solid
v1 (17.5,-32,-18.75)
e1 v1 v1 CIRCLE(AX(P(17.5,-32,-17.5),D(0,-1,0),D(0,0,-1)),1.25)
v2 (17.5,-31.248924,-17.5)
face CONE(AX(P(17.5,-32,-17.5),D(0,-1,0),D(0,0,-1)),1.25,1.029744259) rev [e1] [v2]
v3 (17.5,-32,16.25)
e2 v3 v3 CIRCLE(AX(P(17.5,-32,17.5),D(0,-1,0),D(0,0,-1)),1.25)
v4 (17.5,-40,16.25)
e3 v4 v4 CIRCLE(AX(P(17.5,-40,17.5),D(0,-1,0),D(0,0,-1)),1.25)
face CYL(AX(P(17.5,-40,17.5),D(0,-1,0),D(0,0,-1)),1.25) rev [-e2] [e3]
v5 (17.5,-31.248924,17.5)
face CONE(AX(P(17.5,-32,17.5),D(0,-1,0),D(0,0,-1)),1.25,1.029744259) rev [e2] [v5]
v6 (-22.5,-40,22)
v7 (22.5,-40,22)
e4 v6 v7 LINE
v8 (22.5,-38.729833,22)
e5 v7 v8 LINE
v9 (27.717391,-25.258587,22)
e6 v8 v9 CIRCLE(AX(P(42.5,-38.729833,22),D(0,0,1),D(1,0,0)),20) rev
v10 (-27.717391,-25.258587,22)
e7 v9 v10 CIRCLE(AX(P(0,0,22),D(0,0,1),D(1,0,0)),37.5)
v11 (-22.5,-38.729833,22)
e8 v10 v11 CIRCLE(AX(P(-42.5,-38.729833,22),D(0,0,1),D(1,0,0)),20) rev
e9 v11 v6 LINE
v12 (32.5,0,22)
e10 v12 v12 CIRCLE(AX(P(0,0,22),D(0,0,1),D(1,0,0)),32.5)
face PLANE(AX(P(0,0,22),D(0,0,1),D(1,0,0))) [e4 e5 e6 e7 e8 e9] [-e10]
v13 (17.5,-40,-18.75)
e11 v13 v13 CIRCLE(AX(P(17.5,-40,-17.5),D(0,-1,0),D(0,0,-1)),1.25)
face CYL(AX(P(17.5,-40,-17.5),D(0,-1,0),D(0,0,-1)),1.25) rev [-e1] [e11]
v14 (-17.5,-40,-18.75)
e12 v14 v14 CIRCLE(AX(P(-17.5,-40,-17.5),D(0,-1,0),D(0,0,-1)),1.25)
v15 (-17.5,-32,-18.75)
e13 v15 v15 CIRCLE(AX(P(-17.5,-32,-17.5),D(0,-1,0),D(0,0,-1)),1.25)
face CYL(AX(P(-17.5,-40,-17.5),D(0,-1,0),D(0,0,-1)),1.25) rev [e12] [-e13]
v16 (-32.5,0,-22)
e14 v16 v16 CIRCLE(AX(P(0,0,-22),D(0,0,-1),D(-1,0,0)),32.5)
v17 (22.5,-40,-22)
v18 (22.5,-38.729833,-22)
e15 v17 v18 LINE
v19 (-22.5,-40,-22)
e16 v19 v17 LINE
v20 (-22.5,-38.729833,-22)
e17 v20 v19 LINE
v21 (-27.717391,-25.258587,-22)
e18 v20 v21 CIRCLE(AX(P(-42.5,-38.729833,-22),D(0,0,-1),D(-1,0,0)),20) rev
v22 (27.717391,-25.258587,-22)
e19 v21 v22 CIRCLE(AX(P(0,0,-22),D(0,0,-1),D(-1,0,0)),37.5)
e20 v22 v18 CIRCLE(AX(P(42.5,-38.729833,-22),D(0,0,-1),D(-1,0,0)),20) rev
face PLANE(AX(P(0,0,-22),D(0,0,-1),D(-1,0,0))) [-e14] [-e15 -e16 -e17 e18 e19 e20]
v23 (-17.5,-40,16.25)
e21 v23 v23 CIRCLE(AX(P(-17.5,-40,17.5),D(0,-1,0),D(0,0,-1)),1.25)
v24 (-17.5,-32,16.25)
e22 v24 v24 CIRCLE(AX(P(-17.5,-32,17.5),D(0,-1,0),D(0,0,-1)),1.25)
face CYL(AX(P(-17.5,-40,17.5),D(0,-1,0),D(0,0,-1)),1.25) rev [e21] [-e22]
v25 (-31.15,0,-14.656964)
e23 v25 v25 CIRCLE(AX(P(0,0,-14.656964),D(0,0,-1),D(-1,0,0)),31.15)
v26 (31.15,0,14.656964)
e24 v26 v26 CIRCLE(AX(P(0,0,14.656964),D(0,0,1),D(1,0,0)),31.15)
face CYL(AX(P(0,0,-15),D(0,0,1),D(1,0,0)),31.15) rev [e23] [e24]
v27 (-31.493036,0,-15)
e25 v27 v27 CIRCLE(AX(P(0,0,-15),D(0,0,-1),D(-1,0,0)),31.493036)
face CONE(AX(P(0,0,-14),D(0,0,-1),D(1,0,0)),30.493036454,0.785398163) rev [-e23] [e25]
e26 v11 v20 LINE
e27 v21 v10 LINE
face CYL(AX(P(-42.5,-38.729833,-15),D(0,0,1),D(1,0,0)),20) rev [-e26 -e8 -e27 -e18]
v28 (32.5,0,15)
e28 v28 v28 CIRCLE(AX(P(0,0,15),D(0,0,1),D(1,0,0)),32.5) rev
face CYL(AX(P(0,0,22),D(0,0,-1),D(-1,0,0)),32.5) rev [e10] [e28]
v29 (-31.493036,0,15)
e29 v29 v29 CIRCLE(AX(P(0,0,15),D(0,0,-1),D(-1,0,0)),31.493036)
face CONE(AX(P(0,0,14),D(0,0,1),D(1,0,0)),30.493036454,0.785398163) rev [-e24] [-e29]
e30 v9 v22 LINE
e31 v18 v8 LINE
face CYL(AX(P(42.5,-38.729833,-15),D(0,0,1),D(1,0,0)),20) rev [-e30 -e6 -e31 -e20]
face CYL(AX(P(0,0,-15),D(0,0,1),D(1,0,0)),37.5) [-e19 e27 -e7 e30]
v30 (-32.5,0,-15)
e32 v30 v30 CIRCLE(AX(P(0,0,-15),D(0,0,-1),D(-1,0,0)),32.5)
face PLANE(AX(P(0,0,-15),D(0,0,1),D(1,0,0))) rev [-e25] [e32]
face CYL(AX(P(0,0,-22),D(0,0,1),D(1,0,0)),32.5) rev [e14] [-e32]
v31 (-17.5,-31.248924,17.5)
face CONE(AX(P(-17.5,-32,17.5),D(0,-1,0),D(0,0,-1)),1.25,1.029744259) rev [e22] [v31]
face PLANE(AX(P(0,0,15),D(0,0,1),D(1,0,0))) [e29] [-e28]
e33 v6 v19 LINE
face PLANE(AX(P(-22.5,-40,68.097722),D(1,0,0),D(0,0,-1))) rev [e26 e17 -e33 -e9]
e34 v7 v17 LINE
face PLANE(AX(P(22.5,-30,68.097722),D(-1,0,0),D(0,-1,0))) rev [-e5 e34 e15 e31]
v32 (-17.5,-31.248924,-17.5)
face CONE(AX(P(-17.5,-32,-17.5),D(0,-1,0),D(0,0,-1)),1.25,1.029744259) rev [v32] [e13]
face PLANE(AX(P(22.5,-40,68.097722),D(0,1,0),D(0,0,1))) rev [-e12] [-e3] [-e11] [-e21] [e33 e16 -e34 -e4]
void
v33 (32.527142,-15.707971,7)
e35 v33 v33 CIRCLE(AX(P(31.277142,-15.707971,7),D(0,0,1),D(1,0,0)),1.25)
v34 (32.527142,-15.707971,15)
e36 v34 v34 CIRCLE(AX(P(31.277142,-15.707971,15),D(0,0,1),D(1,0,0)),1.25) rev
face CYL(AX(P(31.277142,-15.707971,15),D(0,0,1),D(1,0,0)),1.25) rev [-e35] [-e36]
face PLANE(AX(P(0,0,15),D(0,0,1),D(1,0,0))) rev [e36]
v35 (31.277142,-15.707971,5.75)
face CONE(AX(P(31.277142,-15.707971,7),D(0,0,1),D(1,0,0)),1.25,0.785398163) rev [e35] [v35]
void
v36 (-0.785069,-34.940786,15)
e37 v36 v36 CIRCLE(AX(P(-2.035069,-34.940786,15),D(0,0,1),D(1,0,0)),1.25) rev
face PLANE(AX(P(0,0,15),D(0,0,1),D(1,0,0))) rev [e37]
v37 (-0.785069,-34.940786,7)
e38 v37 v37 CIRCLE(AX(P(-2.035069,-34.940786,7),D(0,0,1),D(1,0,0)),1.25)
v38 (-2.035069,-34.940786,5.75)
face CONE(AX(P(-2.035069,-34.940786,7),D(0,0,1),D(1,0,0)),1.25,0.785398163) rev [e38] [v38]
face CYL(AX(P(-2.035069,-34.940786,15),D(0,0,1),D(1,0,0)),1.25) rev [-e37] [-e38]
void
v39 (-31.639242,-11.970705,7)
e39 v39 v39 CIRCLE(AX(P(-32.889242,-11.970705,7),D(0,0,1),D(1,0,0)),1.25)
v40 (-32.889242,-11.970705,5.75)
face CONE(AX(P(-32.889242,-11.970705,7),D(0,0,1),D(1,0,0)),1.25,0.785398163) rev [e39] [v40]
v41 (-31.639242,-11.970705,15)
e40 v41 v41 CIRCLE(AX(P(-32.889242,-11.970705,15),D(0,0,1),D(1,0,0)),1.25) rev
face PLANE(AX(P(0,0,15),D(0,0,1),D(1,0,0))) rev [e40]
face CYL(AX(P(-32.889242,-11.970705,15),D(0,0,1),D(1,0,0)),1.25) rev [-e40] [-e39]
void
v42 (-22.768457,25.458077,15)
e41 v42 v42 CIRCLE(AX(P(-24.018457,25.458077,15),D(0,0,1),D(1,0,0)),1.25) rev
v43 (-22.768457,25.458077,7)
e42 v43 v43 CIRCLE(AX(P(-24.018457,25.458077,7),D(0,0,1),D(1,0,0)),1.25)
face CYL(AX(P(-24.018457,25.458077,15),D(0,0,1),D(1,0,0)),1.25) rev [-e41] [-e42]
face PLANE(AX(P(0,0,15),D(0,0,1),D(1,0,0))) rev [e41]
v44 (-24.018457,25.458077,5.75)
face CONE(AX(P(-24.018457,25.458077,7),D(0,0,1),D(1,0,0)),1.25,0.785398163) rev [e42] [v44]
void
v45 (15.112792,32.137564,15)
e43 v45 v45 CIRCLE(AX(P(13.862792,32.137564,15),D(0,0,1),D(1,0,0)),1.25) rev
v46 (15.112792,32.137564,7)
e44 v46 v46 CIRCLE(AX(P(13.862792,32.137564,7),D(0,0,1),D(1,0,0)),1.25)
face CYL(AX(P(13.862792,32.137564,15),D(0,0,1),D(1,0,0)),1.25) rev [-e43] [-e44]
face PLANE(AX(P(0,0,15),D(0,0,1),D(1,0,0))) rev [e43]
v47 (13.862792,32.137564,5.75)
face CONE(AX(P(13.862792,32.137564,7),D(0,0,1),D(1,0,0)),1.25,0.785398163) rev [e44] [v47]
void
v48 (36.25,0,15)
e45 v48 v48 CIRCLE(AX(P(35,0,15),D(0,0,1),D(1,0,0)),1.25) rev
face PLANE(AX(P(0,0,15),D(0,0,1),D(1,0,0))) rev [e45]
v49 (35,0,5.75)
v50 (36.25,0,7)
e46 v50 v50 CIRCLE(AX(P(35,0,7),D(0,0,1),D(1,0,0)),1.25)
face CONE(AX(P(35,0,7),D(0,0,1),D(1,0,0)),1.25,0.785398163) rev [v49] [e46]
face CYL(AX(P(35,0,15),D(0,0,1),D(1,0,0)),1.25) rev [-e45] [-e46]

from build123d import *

# Parameters (mm, degrees)
EXTRUSION1_DEPTH              = 15
EXTRUSION1_DEPTH_BACK         = 15
SKETCH1_R                     = 37.5
SKETCH1_R_2                   = 31.15
HOLE4_D                       = 2.5
HOLE4_DEPTH                   = 8
HOLE4_TIP                     = 1.25
SKETCH5_R                     = 37.5
SKETCH5_R_2                   = 32.5
EXTRUSION11_DEPTH             = 7
EXTRUSION17_START             = 7
SKETCH6_R                     = 37.5
SKETCH6_R_2                   = 32.5
EXTRUSION17_DEPTH             = 7
EXTRUSION18_REACH             = 59.415
EXTRUSION18_DIRECTION_2_REACH = 59.415
FILLET5_R                     = 20
HOLE6_D                       = 2.5
HOLE6_DEPTH                   = 8
HOLE6_TIP                     = 0.751075774


with BuildPart() as part:
    # Sketch1 → Extrusion1 (new, two sides: drawn at the far end of the back side and taken through both)
    with BuildSketch(Plane.XY.offset(-EXTRUSION1_DEPTH_BACK)):
        Circle(SKETCH1_R)
        Circle(SKETCH1_R_2, mode=Mode.SUBTRACT)
    extrude(amount=EXTRUSION1_DEPTH + EXTRUSION1_DEPTH_BACK)

    # Hole4
    with Locations(Plane.XY.offset(15)):
        with Locations((35, 0), (13.862791811, 32.137563741), (-24.018457325, 25.458077455), (-32.889241728, -11.970705016), (-2.035069012, -34.940785539), (31.277142411, -15.707971307)):
            Hole(HOLE4_D / 2, depth=HOLE4_DEPTH)
            with Locations((0, 0, -(HOLE4_DEPTH + HOLE4_TIP / 2))):  # 90° drill point
                Cone(0, HOLE4_D / 2, HOLE4_TIP, mode=Mode.SUBTRACT)

    # Sketch5 → Extrusion11 (add)
    with BuildSketch(Plane(origin=(0, 0, -15), x_dir=(-1, 0, 0), z_dir=(0, 0, -1))):
        Circle(SKETCH5_R)
        Circle(SKETCH5_R_2, mode=Mode.SUBTRACT)
    extrude(amount=EXTRUSION11_DEPTH)

    # Sketch6 → Extrusion17 (add)
    with BuildSketch(Plane.XY.offset(15).offset(EXTRUSION17_START)):
        Circle(SKETCH6_R)
        Circle(SKETCH6_R_2, mode=Mode.SUBTRACT)
    extrude(amount=-EXTRUSION17_DEPTH)

    # Extrusion18: up to this face of the body (flat: up to its plane)
    extrusion18_end = Plane(part.part.faces().sort_by_distance((-36.439339828, 0, 22))[0])
    # Sketch7 → Extrusion18 (add, up to the picked face)
    with BuildSketch(Plane.XY, mode=Mode.PRIVATE) as extrusion18_sk1:
        with BuildLine():
            Line((22.5, -40), (-22.5, -40))
            Line((-22.5, -40), (-22.5, -30))
            ThreePointArc((-22.5, -30), (0, -37.5), (22.5, -30))
            Line((22.5, -30), (22.5, -40))
        make_face()
    extrusion18_tool1 = split(extrude(extrusion18_sk1.sketch, amount=EXTRUSION18_REACH, mode=Mode.PRIVATE), bisect_by=extrusion18_end, keep=Keep.BOTH, mode=Mode.PRIVATE)
    add(extrusion18_tool1.solids().sort_by(Axis((22.039023, -35, 0), (0, 0, 1)))[0])

    # Extrusion18 direction 2: up to this face of the body (flat: up to its plane)
    extrusion18_direction_2_end = Plane(part.part.faces().sort_by_distance((36.439339828, 0, -22))[0])
    # Sketch7 → Extrusion18 direction 2 (add, up to the picked face)
    with BuildSketch(Plane.XY, mode=Mode.PRIVATE) as extrusion18_direction_2_sk1:
        with BuildLine():
            Line((22.5, -40), (-22.5, -40))
            Line((-22.5, -40), (-22.5, -30))
            ThreePointArc((-22.5, -30), (0, -37.5), (22.5, -30))
            Line((22.5, -30), (22.5, -40))
        make_face()
    extrusion18_direction_2_tool1 = split(extrude(extrusion18_direction_2_sk1.sketch, amount=-EXTRUSION18_DIRECTION_2_REACH, mode=Mode.PRIVATE), bisect_by=extrusion18_direction_2_end, keep=Keep.BOTH, mode=Mode.PRIVATE)
    add(extrusion18_direction_2_tool1.solids().sort_by(Axis((22.039023, -35, 0), (0, 0, -1)))[0])

    # Fillet5
    fillet5_edges = [part.edges().sort_by_distance(p)[0] for p in [
        (22.5, -30, 0),
        (-22.5, -30, 0),
    ]]
    fillet(fillet5_edges, radius=FILLET5_R)

    # Sketch8 → Revolution1 (revolve, cut)
    with BuildSketch(Plane.YZ):
        Polygon((31.493036454, 15), (30.493036454, 15), (30.493036454, 14), align=None)
    revolution1 = revolve(axis=Axis((0, 0, 0), (0, 0, 1)), mode=Mode.SUBTRACT)

    # Mirror1: Revolution1 across plane
    add(revolution1.mirror(Plane.XY), mode=Mode.SUBTRACT)

    # Hole6
    with Locations(Plane(origin=(0, -40, 0), x_dir=(-1, 0, 0), z_dir=(0, -1, 0))):
        with Locations((-17.5, -17.5), (-17.5, 17.5), (17.5, -17.5), (17.5, 17.5)):
            Hole(HOLE6_D / 2, depth=HOLE6_DEPTH)
            with Locations((0, 0, -(HOLE6_DEPTH + HOLE6_TIP / 2))):  # 118° drill point
                Cone(0, HOLE6_D / 2, HOLE6_TIP, mode=Mode.SUBTRACT)


solid = part.part
